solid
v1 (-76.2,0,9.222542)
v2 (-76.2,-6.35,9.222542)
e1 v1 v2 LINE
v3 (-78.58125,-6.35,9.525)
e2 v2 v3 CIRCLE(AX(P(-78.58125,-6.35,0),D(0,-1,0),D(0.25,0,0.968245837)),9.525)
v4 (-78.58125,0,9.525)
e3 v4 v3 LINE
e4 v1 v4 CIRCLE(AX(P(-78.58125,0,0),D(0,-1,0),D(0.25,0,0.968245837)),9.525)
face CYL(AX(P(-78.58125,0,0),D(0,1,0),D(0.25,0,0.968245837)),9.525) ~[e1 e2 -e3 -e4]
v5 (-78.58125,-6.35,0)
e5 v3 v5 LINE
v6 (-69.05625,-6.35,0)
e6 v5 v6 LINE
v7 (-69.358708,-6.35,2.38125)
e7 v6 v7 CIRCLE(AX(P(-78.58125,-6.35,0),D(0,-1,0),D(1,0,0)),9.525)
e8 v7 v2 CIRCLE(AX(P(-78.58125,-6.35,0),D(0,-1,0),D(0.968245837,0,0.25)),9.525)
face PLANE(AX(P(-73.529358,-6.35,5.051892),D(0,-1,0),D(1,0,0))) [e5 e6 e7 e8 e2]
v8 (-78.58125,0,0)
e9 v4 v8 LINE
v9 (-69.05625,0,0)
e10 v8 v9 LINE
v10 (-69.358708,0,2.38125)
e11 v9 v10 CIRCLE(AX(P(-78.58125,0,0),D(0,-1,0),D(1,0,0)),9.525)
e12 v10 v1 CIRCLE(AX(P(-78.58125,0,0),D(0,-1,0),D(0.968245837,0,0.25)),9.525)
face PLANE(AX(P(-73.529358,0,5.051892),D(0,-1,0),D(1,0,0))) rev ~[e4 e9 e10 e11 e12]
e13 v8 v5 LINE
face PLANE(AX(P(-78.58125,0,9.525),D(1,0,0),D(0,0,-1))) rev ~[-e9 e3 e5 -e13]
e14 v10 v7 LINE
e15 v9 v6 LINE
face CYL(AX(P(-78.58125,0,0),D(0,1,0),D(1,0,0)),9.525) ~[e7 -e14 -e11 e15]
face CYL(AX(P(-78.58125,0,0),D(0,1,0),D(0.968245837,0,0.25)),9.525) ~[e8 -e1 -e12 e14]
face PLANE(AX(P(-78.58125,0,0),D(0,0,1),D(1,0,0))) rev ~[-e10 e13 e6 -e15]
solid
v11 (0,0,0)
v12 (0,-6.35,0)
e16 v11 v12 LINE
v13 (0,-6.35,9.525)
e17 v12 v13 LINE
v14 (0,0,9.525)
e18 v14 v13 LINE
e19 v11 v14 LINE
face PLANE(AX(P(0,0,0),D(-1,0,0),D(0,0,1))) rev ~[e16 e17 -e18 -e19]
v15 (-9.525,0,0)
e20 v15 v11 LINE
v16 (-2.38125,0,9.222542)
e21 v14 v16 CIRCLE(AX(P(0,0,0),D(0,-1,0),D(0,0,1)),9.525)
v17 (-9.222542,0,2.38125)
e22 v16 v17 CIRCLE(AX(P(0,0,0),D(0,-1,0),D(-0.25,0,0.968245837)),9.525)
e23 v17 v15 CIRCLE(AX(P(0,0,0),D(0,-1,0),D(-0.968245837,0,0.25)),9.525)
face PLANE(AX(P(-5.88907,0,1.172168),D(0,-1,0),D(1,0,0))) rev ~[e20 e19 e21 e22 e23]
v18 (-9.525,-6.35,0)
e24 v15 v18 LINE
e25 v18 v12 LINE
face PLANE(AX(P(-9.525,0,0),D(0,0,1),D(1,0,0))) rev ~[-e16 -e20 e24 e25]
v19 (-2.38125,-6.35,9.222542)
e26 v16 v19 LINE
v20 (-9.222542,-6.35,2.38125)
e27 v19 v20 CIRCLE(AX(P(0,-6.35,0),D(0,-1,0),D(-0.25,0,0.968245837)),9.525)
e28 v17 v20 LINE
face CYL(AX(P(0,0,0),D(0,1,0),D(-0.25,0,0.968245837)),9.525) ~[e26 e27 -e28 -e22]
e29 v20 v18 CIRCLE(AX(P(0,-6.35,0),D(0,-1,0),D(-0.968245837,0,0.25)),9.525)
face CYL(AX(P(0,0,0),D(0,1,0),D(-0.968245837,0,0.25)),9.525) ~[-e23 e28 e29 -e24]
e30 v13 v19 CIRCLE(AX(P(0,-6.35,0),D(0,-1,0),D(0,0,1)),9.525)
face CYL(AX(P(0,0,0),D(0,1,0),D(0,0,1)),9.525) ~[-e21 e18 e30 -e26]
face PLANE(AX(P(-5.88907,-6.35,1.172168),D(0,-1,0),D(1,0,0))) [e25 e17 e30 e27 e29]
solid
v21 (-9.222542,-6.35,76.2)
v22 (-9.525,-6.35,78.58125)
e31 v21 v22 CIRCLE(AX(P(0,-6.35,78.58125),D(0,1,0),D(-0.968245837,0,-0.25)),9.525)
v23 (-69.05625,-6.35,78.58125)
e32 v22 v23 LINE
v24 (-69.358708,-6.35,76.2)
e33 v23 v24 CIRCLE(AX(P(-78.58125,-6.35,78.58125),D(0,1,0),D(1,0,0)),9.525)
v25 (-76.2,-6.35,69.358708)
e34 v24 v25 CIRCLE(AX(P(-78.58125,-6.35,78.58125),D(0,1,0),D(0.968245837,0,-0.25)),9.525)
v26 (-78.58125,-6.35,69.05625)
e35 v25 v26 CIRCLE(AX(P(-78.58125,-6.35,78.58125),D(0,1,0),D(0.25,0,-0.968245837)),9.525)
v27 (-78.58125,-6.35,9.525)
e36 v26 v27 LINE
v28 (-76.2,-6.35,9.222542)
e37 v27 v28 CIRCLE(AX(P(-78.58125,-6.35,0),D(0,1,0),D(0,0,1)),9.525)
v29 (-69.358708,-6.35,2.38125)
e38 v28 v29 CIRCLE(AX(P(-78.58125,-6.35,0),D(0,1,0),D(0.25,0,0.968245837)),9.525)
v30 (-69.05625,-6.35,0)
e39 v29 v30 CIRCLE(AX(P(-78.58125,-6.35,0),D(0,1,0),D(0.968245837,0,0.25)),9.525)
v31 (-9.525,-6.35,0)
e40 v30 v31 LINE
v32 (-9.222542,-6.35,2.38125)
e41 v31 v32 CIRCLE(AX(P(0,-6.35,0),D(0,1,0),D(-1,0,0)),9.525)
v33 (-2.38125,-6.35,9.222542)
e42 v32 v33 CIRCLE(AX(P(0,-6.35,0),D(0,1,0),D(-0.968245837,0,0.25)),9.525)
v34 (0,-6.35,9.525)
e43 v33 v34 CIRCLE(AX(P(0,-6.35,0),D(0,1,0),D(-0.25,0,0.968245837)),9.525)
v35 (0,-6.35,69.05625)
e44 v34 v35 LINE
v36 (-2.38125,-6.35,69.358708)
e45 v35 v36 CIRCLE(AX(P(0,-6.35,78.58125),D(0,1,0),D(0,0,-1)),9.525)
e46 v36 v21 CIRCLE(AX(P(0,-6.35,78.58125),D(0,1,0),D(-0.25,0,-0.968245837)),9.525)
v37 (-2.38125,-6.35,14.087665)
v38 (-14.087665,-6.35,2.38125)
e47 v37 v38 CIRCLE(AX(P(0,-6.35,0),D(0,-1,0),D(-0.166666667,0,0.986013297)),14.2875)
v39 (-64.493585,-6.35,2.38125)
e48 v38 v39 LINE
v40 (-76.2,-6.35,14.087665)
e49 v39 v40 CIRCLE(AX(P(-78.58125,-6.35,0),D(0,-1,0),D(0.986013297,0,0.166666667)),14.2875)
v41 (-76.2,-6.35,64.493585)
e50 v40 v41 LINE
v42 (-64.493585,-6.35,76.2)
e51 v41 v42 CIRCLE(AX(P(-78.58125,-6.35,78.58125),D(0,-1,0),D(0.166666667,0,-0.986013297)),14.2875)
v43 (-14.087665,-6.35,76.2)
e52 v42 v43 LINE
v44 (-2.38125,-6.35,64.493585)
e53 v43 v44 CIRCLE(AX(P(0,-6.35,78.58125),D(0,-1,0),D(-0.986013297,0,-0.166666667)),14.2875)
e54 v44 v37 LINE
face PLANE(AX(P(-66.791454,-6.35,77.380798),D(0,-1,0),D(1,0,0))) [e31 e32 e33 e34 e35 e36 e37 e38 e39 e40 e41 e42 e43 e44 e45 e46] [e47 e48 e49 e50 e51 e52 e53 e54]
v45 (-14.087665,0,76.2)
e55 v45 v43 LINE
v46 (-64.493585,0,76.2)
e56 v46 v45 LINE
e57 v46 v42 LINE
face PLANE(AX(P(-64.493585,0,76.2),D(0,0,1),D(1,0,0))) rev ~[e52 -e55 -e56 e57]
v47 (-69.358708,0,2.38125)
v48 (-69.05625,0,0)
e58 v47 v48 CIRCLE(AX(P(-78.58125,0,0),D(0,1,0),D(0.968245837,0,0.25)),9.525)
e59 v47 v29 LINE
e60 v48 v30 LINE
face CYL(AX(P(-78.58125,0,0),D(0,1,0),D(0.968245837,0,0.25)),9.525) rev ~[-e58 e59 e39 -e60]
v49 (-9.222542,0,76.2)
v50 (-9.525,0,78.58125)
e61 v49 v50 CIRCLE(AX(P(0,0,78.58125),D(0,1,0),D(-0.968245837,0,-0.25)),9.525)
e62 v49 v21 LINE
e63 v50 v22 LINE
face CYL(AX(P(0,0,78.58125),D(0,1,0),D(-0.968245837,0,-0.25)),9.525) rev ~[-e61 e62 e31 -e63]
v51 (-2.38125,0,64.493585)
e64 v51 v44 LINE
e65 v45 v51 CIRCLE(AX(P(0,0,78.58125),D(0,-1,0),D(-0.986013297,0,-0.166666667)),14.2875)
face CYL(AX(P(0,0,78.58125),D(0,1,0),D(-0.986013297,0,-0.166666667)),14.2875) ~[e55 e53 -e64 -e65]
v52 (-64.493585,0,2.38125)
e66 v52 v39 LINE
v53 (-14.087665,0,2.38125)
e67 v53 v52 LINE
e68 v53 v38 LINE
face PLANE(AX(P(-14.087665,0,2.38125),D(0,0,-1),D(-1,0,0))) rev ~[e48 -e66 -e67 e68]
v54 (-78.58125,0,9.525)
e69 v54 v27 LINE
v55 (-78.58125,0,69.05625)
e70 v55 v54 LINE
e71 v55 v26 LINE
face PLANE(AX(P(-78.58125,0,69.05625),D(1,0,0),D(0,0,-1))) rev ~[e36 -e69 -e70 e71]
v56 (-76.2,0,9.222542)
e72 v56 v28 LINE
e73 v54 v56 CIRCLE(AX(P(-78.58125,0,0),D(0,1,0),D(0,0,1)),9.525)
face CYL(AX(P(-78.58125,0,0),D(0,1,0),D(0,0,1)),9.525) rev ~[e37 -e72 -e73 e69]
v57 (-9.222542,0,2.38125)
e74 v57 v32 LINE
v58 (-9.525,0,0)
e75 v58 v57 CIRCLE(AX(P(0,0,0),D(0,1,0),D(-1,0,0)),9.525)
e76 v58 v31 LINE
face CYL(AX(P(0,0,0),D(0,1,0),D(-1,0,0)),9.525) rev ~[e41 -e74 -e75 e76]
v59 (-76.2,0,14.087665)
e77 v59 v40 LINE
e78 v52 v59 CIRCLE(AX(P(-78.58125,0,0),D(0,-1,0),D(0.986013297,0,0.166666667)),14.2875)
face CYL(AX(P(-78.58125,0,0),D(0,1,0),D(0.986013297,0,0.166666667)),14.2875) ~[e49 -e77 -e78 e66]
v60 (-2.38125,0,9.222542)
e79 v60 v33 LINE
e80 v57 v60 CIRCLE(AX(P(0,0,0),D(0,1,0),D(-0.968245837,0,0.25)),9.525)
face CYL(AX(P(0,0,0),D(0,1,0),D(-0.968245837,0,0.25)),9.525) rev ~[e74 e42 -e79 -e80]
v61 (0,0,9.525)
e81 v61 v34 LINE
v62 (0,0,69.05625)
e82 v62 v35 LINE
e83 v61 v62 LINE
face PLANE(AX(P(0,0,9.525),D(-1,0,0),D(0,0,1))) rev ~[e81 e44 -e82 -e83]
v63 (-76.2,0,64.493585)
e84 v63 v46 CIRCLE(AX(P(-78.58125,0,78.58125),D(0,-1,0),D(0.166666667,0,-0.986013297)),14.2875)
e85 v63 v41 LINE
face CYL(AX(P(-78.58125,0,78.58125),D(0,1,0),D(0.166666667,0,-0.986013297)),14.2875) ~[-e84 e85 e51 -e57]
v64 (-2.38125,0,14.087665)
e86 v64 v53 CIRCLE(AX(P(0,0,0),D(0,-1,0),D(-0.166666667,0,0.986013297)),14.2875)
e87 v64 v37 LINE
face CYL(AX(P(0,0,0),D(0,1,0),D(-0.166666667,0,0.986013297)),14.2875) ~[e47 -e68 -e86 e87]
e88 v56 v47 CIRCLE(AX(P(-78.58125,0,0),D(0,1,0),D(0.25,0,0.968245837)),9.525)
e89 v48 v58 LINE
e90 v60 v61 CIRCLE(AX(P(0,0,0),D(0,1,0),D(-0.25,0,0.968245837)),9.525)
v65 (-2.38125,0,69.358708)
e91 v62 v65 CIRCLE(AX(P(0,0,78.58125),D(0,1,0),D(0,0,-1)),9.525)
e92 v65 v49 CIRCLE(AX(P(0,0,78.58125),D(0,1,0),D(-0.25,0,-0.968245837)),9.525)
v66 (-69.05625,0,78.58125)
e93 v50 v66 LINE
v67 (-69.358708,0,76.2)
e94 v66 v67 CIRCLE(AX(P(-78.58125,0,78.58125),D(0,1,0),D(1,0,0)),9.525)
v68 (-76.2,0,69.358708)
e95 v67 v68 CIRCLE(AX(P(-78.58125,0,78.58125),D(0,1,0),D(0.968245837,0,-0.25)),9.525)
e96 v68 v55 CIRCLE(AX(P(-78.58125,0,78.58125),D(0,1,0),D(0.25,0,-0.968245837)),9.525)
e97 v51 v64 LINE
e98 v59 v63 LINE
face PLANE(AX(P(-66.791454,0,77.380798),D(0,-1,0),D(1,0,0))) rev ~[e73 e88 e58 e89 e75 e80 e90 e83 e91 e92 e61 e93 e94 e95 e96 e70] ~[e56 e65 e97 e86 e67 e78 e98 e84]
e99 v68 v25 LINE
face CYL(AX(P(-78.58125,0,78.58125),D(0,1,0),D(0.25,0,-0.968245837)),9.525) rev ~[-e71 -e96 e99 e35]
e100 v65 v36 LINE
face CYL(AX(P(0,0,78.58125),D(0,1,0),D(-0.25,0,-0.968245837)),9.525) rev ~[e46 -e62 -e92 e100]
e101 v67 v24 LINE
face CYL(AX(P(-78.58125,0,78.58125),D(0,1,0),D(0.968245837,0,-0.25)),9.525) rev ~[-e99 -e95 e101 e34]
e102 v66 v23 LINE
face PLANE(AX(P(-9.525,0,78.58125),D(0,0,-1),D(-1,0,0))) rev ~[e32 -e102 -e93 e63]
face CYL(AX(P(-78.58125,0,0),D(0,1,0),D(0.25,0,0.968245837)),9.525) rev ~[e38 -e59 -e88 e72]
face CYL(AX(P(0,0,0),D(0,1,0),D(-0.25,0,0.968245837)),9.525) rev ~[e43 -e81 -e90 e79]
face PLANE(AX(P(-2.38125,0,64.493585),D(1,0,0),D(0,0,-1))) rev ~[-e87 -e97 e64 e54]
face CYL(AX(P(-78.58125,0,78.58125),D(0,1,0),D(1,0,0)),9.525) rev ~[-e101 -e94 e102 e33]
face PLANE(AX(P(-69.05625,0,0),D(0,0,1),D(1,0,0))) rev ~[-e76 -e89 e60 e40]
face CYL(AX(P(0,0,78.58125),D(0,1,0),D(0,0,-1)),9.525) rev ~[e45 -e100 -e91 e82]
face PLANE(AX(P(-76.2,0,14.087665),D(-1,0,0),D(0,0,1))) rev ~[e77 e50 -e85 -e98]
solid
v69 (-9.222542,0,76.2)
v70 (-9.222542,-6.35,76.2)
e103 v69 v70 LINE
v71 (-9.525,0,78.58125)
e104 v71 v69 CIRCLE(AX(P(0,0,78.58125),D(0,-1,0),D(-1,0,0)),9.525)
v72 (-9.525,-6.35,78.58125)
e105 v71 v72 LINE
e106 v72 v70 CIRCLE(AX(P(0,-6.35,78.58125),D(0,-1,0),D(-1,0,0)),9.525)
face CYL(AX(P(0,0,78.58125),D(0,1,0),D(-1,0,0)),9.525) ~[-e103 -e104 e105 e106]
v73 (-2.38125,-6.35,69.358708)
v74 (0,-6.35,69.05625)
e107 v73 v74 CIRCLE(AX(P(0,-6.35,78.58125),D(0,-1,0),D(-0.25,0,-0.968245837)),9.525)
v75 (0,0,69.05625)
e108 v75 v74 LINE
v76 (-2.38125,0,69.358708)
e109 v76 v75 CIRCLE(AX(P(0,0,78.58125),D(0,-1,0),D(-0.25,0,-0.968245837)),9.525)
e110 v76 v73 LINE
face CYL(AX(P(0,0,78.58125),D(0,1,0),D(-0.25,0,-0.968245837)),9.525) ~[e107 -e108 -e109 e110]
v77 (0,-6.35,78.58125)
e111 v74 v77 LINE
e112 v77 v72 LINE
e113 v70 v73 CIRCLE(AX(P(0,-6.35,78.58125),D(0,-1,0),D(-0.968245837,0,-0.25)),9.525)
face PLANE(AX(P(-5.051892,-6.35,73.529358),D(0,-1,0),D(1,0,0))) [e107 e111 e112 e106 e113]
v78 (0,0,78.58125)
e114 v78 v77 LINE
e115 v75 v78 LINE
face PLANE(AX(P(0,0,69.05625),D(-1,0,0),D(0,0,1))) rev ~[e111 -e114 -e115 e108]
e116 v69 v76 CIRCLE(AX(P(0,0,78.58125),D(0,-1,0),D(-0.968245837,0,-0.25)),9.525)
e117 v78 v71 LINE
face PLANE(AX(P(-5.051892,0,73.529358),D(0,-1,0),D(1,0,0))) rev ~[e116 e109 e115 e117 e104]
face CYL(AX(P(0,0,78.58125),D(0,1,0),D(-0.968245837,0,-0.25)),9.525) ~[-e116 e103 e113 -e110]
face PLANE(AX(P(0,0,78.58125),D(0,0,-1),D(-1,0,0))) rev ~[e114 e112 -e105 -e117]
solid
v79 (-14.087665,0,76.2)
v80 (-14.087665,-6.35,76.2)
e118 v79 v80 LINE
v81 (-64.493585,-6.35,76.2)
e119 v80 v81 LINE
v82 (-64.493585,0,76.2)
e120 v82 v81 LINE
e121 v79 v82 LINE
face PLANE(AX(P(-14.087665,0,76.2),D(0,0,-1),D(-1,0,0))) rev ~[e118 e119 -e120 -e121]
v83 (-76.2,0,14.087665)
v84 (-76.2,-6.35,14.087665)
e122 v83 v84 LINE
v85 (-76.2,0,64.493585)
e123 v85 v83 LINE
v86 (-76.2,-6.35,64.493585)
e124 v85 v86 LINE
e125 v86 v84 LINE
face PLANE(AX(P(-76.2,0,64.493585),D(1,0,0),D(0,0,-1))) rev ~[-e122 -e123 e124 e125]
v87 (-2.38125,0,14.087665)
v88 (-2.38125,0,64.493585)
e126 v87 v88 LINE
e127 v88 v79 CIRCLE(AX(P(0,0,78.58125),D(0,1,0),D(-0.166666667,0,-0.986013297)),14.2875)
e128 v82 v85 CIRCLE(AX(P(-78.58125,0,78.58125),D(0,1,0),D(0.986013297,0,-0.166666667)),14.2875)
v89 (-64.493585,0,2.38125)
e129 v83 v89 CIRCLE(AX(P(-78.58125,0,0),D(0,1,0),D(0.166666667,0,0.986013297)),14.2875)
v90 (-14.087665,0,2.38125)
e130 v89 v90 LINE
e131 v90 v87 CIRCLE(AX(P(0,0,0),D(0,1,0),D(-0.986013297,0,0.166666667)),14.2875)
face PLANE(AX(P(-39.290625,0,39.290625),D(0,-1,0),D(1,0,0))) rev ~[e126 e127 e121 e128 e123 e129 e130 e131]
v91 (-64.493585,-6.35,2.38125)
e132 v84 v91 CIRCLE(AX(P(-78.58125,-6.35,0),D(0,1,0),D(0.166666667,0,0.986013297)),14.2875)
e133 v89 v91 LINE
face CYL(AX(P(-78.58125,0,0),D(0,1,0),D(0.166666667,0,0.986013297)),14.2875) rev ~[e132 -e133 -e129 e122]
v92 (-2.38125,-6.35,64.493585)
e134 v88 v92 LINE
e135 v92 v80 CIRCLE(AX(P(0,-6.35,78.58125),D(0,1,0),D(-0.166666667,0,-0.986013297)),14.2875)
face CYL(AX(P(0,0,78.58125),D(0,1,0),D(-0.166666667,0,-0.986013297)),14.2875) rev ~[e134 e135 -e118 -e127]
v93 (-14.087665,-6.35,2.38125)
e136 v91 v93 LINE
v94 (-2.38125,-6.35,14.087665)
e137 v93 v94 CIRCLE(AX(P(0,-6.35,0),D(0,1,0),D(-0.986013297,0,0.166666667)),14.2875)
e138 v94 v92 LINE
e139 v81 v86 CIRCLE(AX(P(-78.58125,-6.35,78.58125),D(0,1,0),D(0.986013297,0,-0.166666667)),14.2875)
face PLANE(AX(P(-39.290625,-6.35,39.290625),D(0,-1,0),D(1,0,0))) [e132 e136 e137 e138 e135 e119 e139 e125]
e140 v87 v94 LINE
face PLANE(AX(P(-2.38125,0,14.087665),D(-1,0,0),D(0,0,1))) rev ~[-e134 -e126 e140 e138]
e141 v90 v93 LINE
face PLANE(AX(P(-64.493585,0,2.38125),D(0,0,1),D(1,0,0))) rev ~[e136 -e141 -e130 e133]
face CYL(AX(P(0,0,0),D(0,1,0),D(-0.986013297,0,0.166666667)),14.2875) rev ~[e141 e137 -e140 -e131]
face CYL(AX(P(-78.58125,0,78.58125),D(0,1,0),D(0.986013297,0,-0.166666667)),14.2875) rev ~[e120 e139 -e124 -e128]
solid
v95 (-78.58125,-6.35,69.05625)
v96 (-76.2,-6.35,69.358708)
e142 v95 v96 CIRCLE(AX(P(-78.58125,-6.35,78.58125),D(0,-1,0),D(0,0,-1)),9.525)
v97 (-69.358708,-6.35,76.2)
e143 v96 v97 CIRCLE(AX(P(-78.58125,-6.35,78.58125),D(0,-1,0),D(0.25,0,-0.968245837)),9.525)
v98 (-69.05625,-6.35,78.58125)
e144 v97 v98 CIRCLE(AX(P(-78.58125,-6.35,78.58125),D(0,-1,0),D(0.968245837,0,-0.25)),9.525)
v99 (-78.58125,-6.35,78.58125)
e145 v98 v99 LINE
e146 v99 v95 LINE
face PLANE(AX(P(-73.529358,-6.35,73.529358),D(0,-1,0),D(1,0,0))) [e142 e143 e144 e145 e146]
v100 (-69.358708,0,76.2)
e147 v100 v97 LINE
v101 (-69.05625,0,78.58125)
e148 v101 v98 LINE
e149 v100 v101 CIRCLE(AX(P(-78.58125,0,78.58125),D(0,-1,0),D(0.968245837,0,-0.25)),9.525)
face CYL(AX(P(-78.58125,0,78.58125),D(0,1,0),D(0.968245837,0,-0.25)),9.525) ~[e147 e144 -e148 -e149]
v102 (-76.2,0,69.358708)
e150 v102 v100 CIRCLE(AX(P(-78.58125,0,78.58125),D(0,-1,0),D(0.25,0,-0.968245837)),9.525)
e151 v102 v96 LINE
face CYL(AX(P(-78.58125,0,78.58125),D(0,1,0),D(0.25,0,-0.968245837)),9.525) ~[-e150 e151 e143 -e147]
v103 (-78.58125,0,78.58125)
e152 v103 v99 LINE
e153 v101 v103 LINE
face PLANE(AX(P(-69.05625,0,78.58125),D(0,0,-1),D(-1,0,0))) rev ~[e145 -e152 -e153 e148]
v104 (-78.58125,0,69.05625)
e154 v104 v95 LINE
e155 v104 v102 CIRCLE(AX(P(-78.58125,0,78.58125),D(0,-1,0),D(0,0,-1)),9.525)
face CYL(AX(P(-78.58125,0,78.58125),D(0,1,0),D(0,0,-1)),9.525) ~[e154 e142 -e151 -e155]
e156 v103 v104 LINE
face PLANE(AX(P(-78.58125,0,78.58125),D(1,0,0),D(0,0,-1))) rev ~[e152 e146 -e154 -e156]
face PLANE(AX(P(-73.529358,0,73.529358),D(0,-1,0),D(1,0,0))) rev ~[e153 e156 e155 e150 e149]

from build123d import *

# Parameters (mm, degrees)
F2_DEPTH = 6.35
F3_DEPTH = 6.35
F1_W     = 2.38125
F1_H     = 2.38125
F4_DEPTH = 6.35


with BuildPart() as f2:
    # F1 (on face) → F2 (new body)
    with BuildSketch(Plane.XZ):
        with BuildLine():
            Line((-76.2, 64.4935850165), (-76.2, 14.0876649835))
            ThreePointArc((-76.2, 14.0876649835), (-68.4784618638, 10.1027881362), (-64.4935850165, 2.38125))
            Line((-64.4935850165, 2.38125), (-14.0876649835, 2.38125))
            ThreePointArc((-14.0876649835, 2.38125), (-10.1027881362, 10.1027881362), (-2.38125, 14.0876649835))
            Line((-2.38125, 14.0876649835), (-2.38125, 64.4935850165))
            ThreePointArc((-2.38125, 64.4935850165), (-10.1027881362, 68.4784618638), (-14.0876649835, 76.2))
            Line((-14.0876649835, 76.2), (-64.4935850165, 76.2))
            ThreePointArc((-64.4935850165, 76.2), (-68.4784618638, 68.4784618638), (-76.2, 64.4935850165))
        make_face()
    extrude(amount=F2_DEPTH)


with BuildPart() as f3:
    # F1 (on face) → F3 (new body)
    with BuildSketch(Plane.XZ):
        with BuildLine():
            Line((-76.2, 76.2), (-76.2, 69.3587084068))
            ThreePointArc((-76.2, 69.3587084068), (-71.8460579092, 71.8460579092), (-69.3587084068, 76.2))
            Line((-69.3587084068, 76.2), (-76.2, 76.2))
        make_face()
        with BuildLine():
            Line((-78.58125, 78.58125), (-78.58125, 69.05625))
            ThreePointArc((-78.58125, 69.05625), (-77.3810591141, 69.1321671431), (-76.2, 69.3587084068))
            Line((-76.2, 69.3587084068), (-76.2, 76.2))
            Line((-76.2, 76.2), (-69.3587084068, 76.2))
            ThreePointArc((-69.3587084068, 76.2), (-69.1321671431, 77.3810591141), (-69.05625, 78.58125))
            Line((-69.05625, 78.58125), (-78.58125, 78.58125))
        make_face()
    extrude(amount=F3_DEPTH)


with BuildPart() as f3b:
    # F1 (on face) → F3, piece 2 (new body)
    with BuildSketch(Plane.XZ):
        with BuildLine():
            Line((-2.38125, 76.2), (-9.2225415932, 76.2))
            ThreePointArc((-9.2225415932, 76.2), (-6.7351920908, 71.8460579092), (-2.38125, 69.3587084068))
            Line((-2.38125, 69.3587084068), (-2.38125, 76.2))
        make_face()
        with BuildLine():
            ThreePointArc((-2.38125, 69.3587084068), (-1.2001908859, 69.1321671431), (0, 69.05625))
            Line((0, 69.05625), (0, 76.2))
            Line((0, 76.2), (-2.38125, 76.2))
            Line((-2.38125, 76.2), (-2.38125, 69.3587084068))
        make_face()
        with BuildLine():
            Line((0, 78.58125), (-9.525, 78.58125))
            ThreePointArc((-9.525, 78.58125), (-9.4490828569, 77.3810591141), (-9.2225415932, 76.2))
            Line((-9.2225415932, 76.2), (-2.38125, 76.2))
            Line((-2.38125, 76.2), (0, 76.2))
            Line((0, 76.2), (0, 78.58125))
        make_face()
    extrude(amount=F3_DEPTH)


with BuildPart() as f3c:
    # F1 (on face) → F3, piece 3 (new body)
    with BuildSketch(Plane.XZ):
        with BuildLine():
            ThreePointArc((-9.2225415932, 2.38125), (-9.4490828569, 1.2001908859), (-9.525, 0))
            Line((-9.525, 0), (-2.38125, 0))
            Line((-2.38125, 0), (-2.38125, 2.38125))
            Line((-2.38125, 2.38125), (-9.2225415932, 2.38125))
        make_face()
        with BuildLine():
            ThreePointArc((-2.38125, 9.2225415932), (-6.7351920908, 6.7351920908), (-9.2225415932, 2.38125))
            Line((-9.2225415932, 2.38125), (-2.38125, 2.38125))
            Line((-2.38125, 2.38125), (-2.38125, 9.2225415932))
        make_face()
        with Locations((-1.190625, 1.190625)):
            Rectangle(F1_W, F1_H)
        with BuildLine():
            Line((-2.38125, 2.38125), (0, 2.38125))
            Line((0, 2.38125), (0, 9.525))
            ThreePointArc((0, 9.525), (-1.2001908859, 9.4490828569), (-2.38125, 9.2225415932))
            Line((-2.38125, 9.2225415932), (-2.38125, 2.38125))
        make_face()
    extrude(amount=F3_DEPTH)


with BuildPart() as f3d:
    # F1 (on face) → F3, piece 4 (new body)
    with BuildSketch(Plane.XZ):
        with BuildLine():
            ThreePointArc((-69.3587084068, 2.38125), (-71.8460579092, 6.7351920908), (-76.2, 9.2225415932))
            Line((-76.2, 9.2225415932), (-76.2, 2.38125))
            Line((-76.2, 2.38125), (-69.3587084068, 2.38125))
        make_face()
        with BuildLine():
            Line((-76.2, 2.38125), (-76.2, 0))
            Line((-76.2, 0), (-69.05625, 0))
            ThreePointArc((-69.05625, 0), (-69.1321671431, 1.2001908859), (-69.3587084068, 2.38125))
            Line((-69.3587084068, 2.38125), (-76.2, 2.38125))
        make_face()
        with BuildLine():
            Line((-78.58125, 9.525), (-78.58125, 0))
            Line((-78.58125, 0), (-76.2, 0))
            Line((-76.2, 0), (-76.2, 2.38125))
            Line((-76.2, 2.38125), (-76.2, 9.2225415932))
            ThreePointArc((-76.2, 9.2225415932), (-77.3810591141, 9.4490828569), (-78.58125, 9.525))
        make_face()
    extrude(amount=F3_DEPTH)


with BuildPart() as f4:
    # F1 (on face) → F4 (new body)
    with BuildSketch(Plane.XZ):
        with BuildLine():
            ThreePointArc((-64.4935850165, 76.2), (-64.3437964057, 77.3864398063), (-64.29375, 78.58125))
            Line((-64.29375, 78.58125), (-69.05625, 78.58125))
            ThreePointArc((-69.05625, 78.58125), (-69.1321671431, 77.3810591141), (-69.3587084068, 76.2))
            Line((-69.3587084068, 76.2), (-64.4935850165, 76.2))
        make_face()
        with BuildLine():
            Line((-76.2, 69.3587084068), (-76.2, 64.4935850165))
            ThreePointArc((-76.2, 64.4935850165), (-68.4784618638, 68.4784618638), (-64.4935850165, 76.2))
            Line((-64.4935850165, 76.2), (-69.3587084068, 76.2))
            ThreePointArc((-69.3587084068, 76.2), (-71.8460579092, 71.8460579092), (-76.2, 69.3587084068))
        make_face()
        with BuildLine():
            Line((-78.58125, 69.05625), (-78.58125, 64.29375))
            ThreePointArc((-78.58125, 64.29375), (-77.3864398063, 64.3437964057), (-76.2, 64.4935850165))
            Line((-76.2, 64.4935850165), (-76.2, 69.3587084068))
            ThreePointArc((-76.2, 69.3587084068), (-77.3810591141, 69.1321671431), (-78.58125, 69.05625))
        make_face()
        with BuildLine():
            Line((-78.58125, 64.29375), (-78.58125, 14.2875))
            ThreePointArc((-78.58125, 14.2875), (-77.3864398063, 14.2374535943), (-76.2, 14.0876649835))
            Line((-76.2, 14.0876649835), (-76.2, 64.4935850165))
            ThreePointArc((-76.2, 64.4935850165), (-77.3864398063, 64.3437964057), (-78.58125, 64.29375))
        make_face()
        with BuildLine():
            ThreePointArc((-76.2, 14.0876649835), (-77.3864398063, 14.2374535943), (-78.58125, 14.2875))
            Line((-78.58125, 14.2875), (-78.58125, 9.525))
            ThreePointArc((-78.58125, 9.525), (-77.3810591141, 9.4490828569), (-76.2, 9.2225415932))
            Line((-76.2, 9.2225415932), (-76.2, 14.0876649835))
        make_face()
        with BuildLine():
            ThreePointArc((-64.4935850165, 2.38125), (-68.4784618638, 10.1027881362), (-76.2, 14.0876649835))
            Line((-76.2, 14.0876649835), (-76.2, 9.2225415932))
            ThreePointArc((-76.2, 9.2225415932), (-71.8460579092, 6.7351920908), (-69.3587084068, 2.38125))
            Line((-69.3587084068, 2.38125), (-64.4935850165, 2.38125))
        make_face()
        with BuildLine():
            Line((-69.05625, 0), (-64.29375, 0))
            ThreePointArc((-64.29375, 0), (-64.3437964057, 1.1948101937), (-64.4935850165, 2.38125))
            Line((-64.4935850165, 2.38125), (-69.3587084068, 2.38125))
            ThreePointArc((-69.3587084068, 2.38125), (-69.1321671431, 1.2001908859), (-69.05625, 0))
        make_face()
        with BuildLine():
            Line((-64.29375, 0), (-14.2875, 0))
            ThreePointArc((-14.2875, 0), (-14.2374535943, 1.1948101937), (-14.0876649835, 2.38125))
            Line((-14.0876649835, 2.38125), (-64.4935850165, 2.38125))
            ThreePointArc((-64.4935850165, 2.38125), (-64.3437964057, 1.1948101937), (-64.29375, 0))
        make_face()
        with BuildLine():
            ThreePointArc((-2.38125, 14.0876649835), (-10.1027881362, 10.1027881362), (-14.0876649835, 2.38125))
            Line((-14.0876649835, 2.38125), (-9.2225415932, 2.38125))
            ThreePointArc((-9.2225415932, 2.38125), (-6.7351920908, 6.7351920908), (-2.38125, 9.2225415932))
            Line((-2.38125, 9.2225415932), (-2.38125, 14.0876649835))
        make_face()
        with BuildLine():
            ThreePointArc((-14.0876649835, 2.38125), (-14.2374535943, 1.1948101937), (-14.2875, 0))
            Line((-14.2875, 0), (-9.525, 0))
            ThreePointArc((-9.525, 0), (-9.4490828569, 1.2001908859), (-9.2225415932, 2.38125))
            Line((-9.2225415932, 2.38125), (-14.0876649835, 2.38125))
        make_face()
        with BuildLine():
            ThreePointArc((-2.38125, 14.0876649835), (-1.1948101937, 14.2374535943), (0, 14.2875))
            Line((0, 14.2875), (0, 64.29375))
            ThreePointArc((0, 64.29375), (-1.1948101937, 64.3437964057), (-2.38125, 64.4935850165))
            Line((-2.38125, 64.4935850165), (-2.38125, 14.0876649835))
        make_face()
        with BuildLine():
            Line((-9.2225415932, 76.2), (-14.0876649835, 76.2))
            ThreePointArc((-14.0876649835, 76.2), (-10.1027881362, 68.4784618638), (-2.38125, 64.4935850165))
            Line((-2.38125, 64.4935850165), (-2.38125, 69.3587084068))
            ThreePointArc((-2.38125, 69.3587084068), (-6.7351920908, 71.8460579092), (-9.2225415932, 76.2))
        make_face()
        with BuildLine():
            ThreePointArc((-2.38125, 64.4935850165), (-1.1948101937, 64.3437964057), (0, 64.29375))
            Line((0, 64.29375), (0, 69.05625))
            ThreePointArc((0, 69.05625), (-1.2001908859, 69.1321671431), (-2.38125, 69.3587084068))
            Line((-2.38125, 69.3587084068), (-2.38125, 64.4935850165))
        make_face()
        with BuildLine():
            Line((-9.525, 78.58125), (-14.2875, 78.58125))
            ThreePointArc((-14.2875, 78.58125), (-14.2374535943, 77.3864398063), (-14.0876649835, 76.2))
            Line((-14.0876649835, 76.2), (-9.2225415932, 76.2))
            ThreePointArc((-9.2225415932, 76.2), (-9.4490828569, 77.3810591141), (-9.525, 78.58125))
        make_face()
        with BuildLine():
            Line((-14.2875, 78.58125), (-64.29375, 78.58125))
            ThreePointArc((-64.29375, 78.58125), (-64.3437964057, 77.3864398063), (-64.4935850165, 76.2))
            Line((-64.4935850165, 76.2), (-14.0876649835, 76.2))
            ThreePointArc((-14.0876649835, 76.2), (-14.2374535943, 77.3864398063), (-14.2875, 78.58125))
        make_face()
        with BuildLine():
            Line((0, 9.525), (0, 14.2875))
            ThreePointArc((0, 14.2875), (-1.1948101937, 14.2374535943), (-2.38125, 14.0876649835))
            Line((-2.38125, 14.0876649835), (-2.38125, 9.2225415932))
            ThreePointArc((-2.38125, 9.2225415932), (-1.2001908859, 9.4490828569), (0, 9.525))
        make_face()
    extrude(amount=F4_DEPTH)


solid = Compound([f2.part, f3.part, f3b.part, f3c.part, f3d.part, f4.part])
